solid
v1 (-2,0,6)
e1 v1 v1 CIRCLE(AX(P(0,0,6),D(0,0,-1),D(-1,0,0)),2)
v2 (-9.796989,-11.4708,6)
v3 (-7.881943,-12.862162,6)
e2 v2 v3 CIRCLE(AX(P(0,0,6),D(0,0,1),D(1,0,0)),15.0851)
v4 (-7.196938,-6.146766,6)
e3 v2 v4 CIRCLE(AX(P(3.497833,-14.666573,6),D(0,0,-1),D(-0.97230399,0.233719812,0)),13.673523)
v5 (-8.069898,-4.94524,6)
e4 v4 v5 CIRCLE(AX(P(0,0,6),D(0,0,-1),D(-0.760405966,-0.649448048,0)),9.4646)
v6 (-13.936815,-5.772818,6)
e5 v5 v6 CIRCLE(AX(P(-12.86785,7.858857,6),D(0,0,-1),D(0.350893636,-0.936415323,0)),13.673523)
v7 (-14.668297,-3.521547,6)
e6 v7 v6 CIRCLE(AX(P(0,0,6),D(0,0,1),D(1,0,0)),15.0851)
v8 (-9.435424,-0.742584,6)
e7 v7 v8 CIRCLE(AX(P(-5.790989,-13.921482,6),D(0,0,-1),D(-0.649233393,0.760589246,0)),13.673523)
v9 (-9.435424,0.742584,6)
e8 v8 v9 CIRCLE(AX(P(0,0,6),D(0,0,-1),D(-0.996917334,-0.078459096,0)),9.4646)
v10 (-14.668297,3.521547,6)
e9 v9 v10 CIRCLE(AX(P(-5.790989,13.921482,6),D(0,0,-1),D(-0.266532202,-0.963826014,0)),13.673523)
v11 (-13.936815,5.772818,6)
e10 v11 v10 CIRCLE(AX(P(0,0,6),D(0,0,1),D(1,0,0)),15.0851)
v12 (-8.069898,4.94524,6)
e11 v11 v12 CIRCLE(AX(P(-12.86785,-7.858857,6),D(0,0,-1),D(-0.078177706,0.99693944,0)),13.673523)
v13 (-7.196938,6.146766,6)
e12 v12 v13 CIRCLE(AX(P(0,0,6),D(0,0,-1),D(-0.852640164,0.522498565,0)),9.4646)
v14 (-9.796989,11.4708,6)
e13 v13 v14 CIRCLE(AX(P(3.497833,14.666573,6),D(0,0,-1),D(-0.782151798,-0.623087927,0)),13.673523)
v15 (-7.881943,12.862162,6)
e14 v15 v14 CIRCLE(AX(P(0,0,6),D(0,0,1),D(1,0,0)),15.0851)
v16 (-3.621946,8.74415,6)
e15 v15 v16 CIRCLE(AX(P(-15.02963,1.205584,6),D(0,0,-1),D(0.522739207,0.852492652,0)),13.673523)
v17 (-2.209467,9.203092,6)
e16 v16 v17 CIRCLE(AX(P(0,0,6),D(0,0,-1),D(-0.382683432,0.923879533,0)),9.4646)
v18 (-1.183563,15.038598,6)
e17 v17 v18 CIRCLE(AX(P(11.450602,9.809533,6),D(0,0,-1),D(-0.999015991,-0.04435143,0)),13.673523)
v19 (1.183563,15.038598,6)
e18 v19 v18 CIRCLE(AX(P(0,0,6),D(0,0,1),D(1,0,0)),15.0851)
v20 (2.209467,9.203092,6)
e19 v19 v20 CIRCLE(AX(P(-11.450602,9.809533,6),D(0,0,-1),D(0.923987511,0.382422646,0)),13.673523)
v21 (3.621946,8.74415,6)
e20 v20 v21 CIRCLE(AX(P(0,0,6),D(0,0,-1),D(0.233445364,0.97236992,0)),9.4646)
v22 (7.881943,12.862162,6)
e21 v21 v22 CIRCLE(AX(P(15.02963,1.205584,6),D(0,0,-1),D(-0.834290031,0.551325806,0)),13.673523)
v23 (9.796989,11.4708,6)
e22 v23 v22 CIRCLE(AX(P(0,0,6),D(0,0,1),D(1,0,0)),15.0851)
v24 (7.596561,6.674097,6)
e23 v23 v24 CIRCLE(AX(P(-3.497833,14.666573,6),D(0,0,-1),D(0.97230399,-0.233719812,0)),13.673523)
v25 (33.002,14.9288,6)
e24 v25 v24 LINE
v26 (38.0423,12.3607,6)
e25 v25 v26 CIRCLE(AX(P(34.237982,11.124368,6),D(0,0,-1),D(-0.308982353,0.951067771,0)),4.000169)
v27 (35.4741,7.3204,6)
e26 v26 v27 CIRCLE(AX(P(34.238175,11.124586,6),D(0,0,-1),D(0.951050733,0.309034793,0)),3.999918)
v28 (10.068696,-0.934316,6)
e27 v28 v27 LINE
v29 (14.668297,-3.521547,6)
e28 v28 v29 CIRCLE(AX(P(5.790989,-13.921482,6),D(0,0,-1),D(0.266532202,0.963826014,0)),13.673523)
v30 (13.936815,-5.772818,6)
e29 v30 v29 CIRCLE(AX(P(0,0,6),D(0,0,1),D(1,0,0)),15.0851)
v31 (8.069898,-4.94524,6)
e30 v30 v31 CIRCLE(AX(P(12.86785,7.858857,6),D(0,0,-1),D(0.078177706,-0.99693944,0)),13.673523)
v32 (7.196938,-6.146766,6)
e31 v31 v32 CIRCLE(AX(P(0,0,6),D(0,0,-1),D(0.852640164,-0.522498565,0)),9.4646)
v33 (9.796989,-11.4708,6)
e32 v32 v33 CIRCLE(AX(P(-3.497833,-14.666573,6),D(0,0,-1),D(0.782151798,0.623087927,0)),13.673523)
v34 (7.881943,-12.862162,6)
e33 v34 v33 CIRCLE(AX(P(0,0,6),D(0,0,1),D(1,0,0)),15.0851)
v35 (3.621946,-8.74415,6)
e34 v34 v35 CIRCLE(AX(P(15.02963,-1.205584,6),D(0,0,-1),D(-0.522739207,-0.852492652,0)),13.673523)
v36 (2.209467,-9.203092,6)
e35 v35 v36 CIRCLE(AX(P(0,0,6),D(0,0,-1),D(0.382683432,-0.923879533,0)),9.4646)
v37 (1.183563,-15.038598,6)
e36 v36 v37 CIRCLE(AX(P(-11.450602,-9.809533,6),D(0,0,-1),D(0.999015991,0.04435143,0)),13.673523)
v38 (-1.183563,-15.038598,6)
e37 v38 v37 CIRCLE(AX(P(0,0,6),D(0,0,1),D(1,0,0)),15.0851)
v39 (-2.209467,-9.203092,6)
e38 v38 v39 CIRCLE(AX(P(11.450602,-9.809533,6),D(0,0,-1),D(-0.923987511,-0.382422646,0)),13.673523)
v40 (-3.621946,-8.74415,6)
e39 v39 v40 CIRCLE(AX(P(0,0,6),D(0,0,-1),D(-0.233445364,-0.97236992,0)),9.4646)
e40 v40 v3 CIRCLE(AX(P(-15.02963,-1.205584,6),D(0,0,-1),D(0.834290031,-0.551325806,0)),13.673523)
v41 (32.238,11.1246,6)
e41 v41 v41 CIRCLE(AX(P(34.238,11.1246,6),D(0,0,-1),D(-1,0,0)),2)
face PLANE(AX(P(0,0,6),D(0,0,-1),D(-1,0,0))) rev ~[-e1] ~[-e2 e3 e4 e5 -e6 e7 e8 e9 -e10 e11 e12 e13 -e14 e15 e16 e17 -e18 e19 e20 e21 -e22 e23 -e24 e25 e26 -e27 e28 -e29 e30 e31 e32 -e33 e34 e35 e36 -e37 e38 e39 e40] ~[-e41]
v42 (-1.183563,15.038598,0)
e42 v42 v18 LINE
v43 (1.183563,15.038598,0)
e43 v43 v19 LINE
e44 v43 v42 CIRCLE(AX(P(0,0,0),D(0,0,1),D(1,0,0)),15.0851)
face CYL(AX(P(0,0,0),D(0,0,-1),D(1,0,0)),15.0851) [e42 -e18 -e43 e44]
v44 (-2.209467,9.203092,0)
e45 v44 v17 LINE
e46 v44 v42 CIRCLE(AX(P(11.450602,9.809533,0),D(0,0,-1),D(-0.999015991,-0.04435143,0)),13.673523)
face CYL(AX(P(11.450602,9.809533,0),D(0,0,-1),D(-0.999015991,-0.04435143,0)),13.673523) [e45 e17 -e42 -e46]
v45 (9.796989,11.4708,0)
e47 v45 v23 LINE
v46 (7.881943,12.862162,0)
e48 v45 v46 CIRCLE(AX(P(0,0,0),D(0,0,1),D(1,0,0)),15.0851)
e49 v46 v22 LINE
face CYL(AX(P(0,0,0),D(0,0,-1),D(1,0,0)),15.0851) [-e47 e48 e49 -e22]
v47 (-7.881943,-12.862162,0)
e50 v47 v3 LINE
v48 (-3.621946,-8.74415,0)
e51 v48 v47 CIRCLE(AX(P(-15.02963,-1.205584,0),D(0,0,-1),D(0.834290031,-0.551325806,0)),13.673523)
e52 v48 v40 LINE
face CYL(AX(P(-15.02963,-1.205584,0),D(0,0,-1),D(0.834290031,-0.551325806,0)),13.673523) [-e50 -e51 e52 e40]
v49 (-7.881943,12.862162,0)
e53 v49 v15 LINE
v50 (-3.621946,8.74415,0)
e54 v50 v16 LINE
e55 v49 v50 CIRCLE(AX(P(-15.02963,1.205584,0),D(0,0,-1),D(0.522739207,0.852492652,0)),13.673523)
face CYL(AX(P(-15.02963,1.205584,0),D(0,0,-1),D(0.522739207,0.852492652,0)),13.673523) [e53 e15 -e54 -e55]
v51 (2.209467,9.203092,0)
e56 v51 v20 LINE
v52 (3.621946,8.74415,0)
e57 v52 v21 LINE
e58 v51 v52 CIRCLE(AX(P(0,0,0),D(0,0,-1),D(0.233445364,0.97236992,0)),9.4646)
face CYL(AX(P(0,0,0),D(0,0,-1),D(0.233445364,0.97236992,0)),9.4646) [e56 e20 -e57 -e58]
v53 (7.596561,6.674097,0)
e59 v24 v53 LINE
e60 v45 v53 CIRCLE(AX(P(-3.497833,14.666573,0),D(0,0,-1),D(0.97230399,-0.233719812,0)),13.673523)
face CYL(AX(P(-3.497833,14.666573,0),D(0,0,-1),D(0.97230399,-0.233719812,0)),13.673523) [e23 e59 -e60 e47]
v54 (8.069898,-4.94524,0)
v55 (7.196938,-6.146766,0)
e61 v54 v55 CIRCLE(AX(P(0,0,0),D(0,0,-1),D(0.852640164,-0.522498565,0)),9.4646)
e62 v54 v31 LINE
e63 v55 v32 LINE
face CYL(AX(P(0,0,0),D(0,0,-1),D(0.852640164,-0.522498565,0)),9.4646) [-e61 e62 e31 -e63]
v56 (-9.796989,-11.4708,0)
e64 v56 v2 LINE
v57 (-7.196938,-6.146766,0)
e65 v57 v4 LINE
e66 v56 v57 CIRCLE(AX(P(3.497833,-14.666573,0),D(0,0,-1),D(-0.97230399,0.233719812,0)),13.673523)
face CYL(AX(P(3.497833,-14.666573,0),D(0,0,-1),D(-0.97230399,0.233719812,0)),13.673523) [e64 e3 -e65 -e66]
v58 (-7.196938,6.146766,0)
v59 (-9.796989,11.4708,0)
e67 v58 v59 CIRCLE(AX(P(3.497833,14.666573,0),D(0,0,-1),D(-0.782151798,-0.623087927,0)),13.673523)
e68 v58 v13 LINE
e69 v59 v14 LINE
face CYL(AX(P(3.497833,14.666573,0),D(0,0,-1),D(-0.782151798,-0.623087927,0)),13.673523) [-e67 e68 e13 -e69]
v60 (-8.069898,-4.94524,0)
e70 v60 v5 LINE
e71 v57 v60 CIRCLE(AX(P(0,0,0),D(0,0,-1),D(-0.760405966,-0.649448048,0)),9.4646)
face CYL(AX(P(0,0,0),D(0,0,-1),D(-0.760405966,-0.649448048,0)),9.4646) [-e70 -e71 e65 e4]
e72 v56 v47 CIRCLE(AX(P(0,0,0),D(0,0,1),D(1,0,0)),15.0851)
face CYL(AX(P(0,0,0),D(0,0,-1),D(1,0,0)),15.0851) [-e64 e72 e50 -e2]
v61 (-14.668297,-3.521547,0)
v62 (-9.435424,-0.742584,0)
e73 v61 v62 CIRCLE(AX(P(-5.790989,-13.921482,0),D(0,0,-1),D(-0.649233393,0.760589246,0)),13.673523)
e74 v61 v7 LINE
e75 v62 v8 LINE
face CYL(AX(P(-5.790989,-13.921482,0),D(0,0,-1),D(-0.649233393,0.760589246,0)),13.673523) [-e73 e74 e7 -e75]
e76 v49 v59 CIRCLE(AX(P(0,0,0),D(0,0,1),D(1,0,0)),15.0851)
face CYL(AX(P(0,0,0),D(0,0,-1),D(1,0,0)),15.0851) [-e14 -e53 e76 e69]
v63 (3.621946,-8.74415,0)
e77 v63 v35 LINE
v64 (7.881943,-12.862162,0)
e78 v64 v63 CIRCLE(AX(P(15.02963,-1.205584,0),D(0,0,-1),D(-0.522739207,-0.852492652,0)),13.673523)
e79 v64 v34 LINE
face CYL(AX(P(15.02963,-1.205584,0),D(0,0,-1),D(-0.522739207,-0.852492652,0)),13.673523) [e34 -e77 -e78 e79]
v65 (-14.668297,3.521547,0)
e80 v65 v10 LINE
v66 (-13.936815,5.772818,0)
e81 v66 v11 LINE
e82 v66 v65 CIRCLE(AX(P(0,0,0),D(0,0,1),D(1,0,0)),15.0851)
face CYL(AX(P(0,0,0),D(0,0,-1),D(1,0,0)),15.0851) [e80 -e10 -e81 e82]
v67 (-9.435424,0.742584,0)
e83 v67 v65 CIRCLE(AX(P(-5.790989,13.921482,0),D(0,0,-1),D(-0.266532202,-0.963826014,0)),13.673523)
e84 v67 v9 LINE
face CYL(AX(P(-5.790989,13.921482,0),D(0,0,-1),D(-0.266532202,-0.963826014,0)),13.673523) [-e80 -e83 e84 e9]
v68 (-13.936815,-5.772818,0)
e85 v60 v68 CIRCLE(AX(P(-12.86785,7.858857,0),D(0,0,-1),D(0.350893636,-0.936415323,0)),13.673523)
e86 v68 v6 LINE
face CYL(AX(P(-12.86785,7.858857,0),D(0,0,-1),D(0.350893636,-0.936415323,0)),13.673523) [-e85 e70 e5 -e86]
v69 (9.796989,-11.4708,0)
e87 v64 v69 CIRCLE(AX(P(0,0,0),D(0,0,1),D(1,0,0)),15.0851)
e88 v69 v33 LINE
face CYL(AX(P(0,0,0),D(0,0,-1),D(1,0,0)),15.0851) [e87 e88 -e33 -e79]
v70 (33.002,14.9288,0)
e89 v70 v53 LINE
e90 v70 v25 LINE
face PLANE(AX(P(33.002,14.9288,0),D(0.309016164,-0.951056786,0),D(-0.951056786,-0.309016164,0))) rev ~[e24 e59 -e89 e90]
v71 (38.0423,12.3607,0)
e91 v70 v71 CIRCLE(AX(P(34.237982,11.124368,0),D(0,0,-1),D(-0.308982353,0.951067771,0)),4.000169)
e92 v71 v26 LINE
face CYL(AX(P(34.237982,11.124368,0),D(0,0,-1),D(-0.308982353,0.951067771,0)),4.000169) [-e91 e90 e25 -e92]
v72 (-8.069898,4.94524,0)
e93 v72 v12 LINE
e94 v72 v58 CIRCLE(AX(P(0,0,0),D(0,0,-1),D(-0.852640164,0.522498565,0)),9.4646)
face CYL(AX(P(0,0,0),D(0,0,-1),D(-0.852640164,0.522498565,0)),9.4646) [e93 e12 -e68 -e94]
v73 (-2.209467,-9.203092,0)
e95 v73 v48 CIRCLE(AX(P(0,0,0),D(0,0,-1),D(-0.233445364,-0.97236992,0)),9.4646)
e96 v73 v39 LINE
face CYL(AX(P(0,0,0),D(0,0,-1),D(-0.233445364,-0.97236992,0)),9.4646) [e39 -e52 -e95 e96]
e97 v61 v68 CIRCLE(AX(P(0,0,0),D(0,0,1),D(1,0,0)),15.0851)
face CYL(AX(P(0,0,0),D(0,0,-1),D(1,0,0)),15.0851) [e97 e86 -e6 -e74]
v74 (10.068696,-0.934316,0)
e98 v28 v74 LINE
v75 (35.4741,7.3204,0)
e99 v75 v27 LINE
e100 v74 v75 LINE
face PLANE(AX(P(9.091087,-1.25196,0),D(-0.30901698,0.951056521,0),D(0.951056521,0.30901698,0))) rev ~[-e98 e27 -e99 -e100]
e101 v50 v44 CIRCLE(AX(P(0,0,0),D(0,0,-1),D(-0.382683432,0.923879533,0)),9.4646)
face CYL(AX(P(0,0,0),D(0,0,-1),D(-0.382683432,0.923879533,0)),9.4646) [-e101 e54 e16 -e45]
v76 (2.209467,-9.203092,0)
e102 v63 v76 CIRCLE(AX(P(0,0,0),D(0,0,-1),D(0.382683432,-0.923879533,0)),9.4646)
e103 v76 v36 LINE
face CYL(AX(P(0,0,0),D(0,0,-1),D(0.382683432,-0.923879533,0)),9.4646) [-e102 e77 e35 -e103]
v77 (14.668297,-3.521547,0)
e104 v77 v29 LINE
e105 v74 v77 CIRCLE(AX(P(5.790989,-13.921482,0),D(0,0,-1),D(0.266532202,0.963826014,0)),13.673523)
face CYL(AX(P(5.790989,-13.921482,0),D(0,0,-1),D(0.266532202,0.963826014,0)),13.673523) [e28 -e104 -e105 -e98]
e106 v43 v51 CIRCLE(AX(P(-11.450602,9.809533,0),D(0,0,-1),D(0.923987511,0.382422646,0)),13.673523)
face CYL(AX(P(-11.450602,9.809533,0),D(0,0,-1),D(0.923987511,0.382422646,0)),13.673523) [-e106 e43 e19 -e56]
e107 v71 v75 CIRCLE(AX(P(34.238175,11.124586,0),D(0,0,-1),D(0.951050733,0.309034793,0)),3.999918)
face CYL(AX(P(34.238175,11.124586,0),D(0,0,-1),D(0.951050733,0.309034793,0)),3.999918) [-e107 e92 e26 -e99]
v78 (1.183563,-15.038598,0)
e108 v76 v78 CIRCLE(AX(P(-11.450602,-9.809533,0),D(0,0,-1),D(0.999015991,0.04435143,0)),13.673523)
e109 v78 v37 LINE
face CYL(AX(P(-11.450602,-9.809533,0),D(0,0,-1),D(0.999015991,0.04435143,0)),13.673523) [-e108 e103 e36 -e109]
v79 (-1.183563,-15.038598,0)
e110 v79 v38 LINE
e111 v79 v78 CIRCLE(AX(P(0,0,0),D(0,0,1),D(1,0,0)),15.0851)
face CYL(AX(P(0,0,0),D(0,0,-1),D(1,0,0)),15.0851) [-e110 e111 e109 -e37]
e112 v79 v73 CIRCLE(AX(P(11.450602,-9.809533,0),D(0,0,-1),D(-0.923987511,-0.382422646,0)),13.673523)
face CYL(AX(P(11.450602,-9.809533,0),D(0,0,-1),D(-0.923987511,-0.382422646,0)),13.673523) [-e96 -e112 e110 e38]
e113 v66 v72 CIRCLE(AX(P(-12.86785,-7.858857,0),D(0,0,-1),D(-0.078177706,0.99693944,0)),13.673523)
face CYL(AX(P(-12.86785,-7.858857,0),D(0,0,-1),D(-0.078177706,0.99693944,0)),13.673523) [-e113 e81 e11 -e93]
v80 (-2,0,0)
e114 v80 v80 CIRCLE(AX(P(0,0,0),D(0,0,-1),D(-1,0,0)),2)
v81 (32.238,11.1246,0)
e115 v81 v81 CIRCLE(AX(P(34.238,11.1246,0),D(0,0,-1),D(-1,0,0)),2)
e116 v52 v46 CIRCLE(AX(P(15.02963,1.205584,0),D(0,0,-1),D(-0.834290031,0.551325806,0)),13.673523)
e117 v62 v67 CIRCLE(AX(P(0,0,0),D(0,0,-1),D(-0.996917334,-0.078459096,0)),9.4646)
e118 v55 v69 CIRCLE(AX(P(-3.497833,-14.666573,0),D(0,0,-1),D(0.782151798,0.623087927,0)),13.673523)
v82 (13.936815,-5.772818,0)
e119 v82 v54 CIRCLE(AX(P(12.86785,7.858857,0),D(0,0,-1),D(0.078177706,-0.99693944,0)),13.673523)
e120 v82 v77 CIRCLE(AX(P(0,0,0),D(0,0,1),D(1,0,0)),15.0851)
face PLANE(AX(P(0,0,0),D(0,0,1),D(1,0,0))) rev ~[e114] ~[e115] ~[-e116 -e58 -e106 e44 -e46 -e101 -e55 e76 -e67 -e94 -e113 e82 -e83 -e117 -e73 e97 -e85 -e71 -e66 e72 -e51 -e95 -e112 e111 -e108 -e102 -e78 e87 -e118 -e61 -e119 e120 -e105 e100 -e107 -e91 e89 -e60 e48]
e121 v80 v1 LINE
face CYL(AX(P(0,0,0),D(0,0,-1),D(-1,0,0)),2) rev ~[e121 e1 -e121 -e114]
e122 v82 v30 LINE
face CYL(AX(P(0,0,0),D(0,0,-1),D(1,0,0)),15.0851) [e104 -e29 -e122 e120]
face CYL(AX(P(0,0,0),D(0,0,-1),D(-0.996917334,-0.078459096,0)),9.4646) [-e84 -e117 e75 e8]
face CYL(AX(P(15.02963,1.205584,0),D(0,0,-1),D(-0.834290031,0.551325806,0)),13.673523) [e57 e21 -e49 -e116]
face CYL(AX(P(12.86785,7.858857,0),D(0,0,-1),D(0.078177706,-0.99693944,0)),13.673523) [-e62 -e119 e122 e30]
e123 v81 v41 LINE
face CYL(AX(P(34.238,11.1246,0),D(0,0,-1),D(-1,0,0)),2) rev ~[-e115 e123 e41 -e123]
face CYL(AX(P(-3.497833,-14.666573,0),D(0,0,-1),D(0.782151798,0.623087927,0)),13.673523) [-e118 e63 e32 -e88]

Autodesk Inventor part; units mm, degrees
sketch "Sketch1" plane through (0, 0, 0) normal (0, 0, 1) x (1, 0, 0)
  circle A0 centre (0, 0) radius 15.0851
  dimension "d0" = 30.1702
extrude "Extrusion1" add sketch "Sketch1" along normal blind 6
ref_plane "Work Plane2" through (0, 0, 3) normal (0, 0, 1) x (-1, 0, 0)
sketch "Sketch2" plane through (0, 0, 0) normal (0, 0, -1) x (-1, 0, 0)
  circle A0 centre (0, 0) radius 15.0851 projected
  circle A1 centre (0, 0) radius 12.5
  dimension "d3" = 25
surface extrude "Pitch Diameter" sketch "Sketch2" against normal through all shown no curves A1
ref_plane "Work Plane8" through (0, 0, 0) normal (0.9510565, 0.309017, 0) x (0, 0, 1)
ref_plane "Work Plane9" through (0, 0, 0) normal (1, 0, 0) x (0, 1, 0)
spur gear teeth "Spur Gear" teeth 10 pitch diameter 25 tip diameter 30.1702 root diameter 18.9292 face width 6 start plane through (0, 0, 0) normal (0, 0, -1) x (-1, 0, 0)
sketch "Sketch3" plane through (0, 0, 0) normal (0, 0, -1) x (-1, 0, 0)
  circle A0 centre (0, 0) radius 2
  dimension "d49" = 4
extrude "Extrusion2" cut sketch "Sketch3" against normal up to surface (6 mm away)
sketch "Sketch4" plane through (0, 0, 0) normal (0, 0, -1) x (-1, 0, 0)
  circle A0 centre (-26.4586, 35.0672) radius 2 projected
  line L0 (-4.8178, 32.2415) -> (-25.2225, 38.8714) projected
  arc A1 (-25.2225, 38.8714) -> (-27.6947, 31.263) centre (-26.4586, 35.0672) ccw projected
  line L1 (-27.6947, 31.263) -> (-7.2899, 24.6331) projected
  arc A2 (-7.2899, 24.6331) -> (-7.2592, 22.759) centre (7.7794, 23.9426) ccw projected
  arc A3 (-7.2592, 22.759) -> (-1.4237, 21.7331) centre (-2.0301, 35.3932) ccw projected
  arc A4 (-1.4237, 21.7331) -> (-0.9647, 20.3206) centre (7.7794, 23.9426) ccw projected
  arc A5 (-0.9647, 20.3206) -> (-5.0828, 16.0606) centre (6.5738, 8.913) ccw projected
  arc A6 (-5.0828, 16.0606) -> (-3.6914, 14.1456) centre (7.7794, 23.9426) ccw projected
  arc A7 (-3.6914, 14.1456) -> (1.6326, 16.7456) centre (-6.8872, 27.4404) ccw projected
  arc A8 (1.6326, 16.7456) -> (2.8342, 15.8727) centre (7.7794, 23.9426) ccw projected
  arc A9 (2.8342, 15.8727) -> (2.0066, 10.0058) centre (15.6383, 11.0747) ccw projected
  arc A10 (2.0066, 10.0058) -> (4.2579, 9.2743) centre (7.7794, 23.9426) ccw projected
  arc A11 (4.2579, 9.2743) -> (7.0368, 14.5072) centre (-6.1421, 18.1516) ccw projected
  arc A12 (7.0368, 14.5072) -> (8.522, 14.5072) centre (7.7794, 23.9426) ccw projected
  arc A13 (8.522, 14.5072) -> (11.301, 9.2743) centre (21.7009, 18.1516) ccw projected
  arc A14 (11.301, 9.2743) -> (13.5522, 10.0058) centre (7.7794, 23.9426) ccw projected
  arc A15 (13.5522, 10.0058) -> (12.7247, 15.8727) centre (-0.0794, 11.0747) ccw projected
  arc A16 (12.7247, 15.8727) -> (13.9262, 16.7456) centre (7.7794, 23.9426) ccw projected
  arc A17 (13.9262, 16.7456) -> (19.2502, 14.1456) centre (22.446, 27.4404) ccw projected
  arc A18 (19.2502, 14.1456) -> (20.6416, 16.0606) centre (7.7794, 23.9426) ccw projected
  arc A19 (20.6416, 16.0606) -> (16.5236, 20.3206) centre (8.985, 8.913) ccw projected
  arc A20 (16.5236, 20.3206) -> (16.9825, 21.7331) centre (7.7794, 23.9426) ccw projected
  arc A21 (16.9825, 21.7331) -> (22.818, 22.759) centre (17.589, 35.3932) ccw projected
  arc A22 (22.818, 22.759) -> (22.818, 25.1262) centre (7.7794, 23.9426) ccw projected
  arc A23 (22.818, 25.1262) -> (16.9825, 26.1521) centre (17.589, 12.492) ccw projected
  arc A24 (16.9825, 26.1521) -> (16.5236, 27.5646) centre (7.7794, 23.9426) ccw projected
  arc A25 (16.5236, 27.5646) -> (20.6416, 31.8246) centre (8.985, 38.9722) ccw projected
  arc A26 (20.6416, 31.8246) -> (19.2502, 33.7396) centre (7.7794, 23.9426) ccw projected
  arc A27 (19.2502, 33.7396) -> (13.9262, 31.1396) centre (22.446, 20.4448) ccw projected
  arc A28 (13.9262, 31.1396) -> (12.7247, 32.0125) centre (7.7794, 23.9426) ccw projected
  arc A29 (12.7247, 32.0125) -> (13.5522, 37.8794) centre (-0.0794, 36.8105) ccw projected
  arc A30 (13.5522, 37.8794) -> (11.301, 38.6109) centre (7.7794, 23.9426) ccw projected
  arc A31 (11.301, 38.6109) -> (8.522, 33.378) centre (21.7009, 29.7336) ccw projected
  arc A32 (8.522, 33.378) -> (7.0368, 33.378) centre (7.7794, 23.9426) ccw projected
  arc A33 (7.0368, 33.378) -> (4.2579, 38.6109) centre (-6.1421, 29.7336) ccw projected
  arc A34 (4.2579, 38.6109) -> (2.0066, 37.8794) centre (7.7794, 23.9426) ccw projected
  arc A35 (2.0066, 37.8794) -> (2.8342, 32.0125) centre (15.6383, 36.8105) ccw projected
  arc A36 (2.8342, 32.0125) -> (1.6326, 31.1396) centre (7.7794, 23.9426) ccw projected
  arc A37 (1.6326, 31.1396) -> (-3.6914, 33.7396) centre (-6.8872, 20.4448) ccw projected
  arc A38 (-3.6914, 33.7396) -> (-4.8178, 32.2415) centre (7.7794, 23.9426) ccw projected
  circle A39 centre (7.7794, 23.9426) radius 1.5 projected
  line L2 (-1.2361, -3.8042) -> (-35.4741, 7.3204)
  line L3 (-38.0423, 12.3607) -> (-38.0423, 12.3607)
  line L4 (-33.002, 14.9288) -> (1.2361, 3.8042)
  line L5 (1.2361, 3.8042) -> (-1.2361, -3.8042)
  circle A40 centre (-34.238, 11.1246) radius 2
  arc A41 (-38.0423, 12.3607) -> (-35.4741, 7.3204) centre (-34.238, 11.1246) ccw
  arc A42 (-33.002, 14.9288) -> (-38.0423, 12.3607) centre (-34.238, 11.1246) ccw
  line L6 (-6.619, 6.3565) -> (-9.0911, -1.252)
  point P0 (0, 0)
  point P1 (-36.8062, 16.1649)
  point P2 (-39.2783, 8.5565)
  point P3 (-38.0423, 12.3607)
  dimension "d61" = 40
  dimension "d62" = 8
  dimension "d63" = 4
  dimension "d64" = 0
  dimension "d65" = 4
  dimension "d66" = 4
  dimension "d67" = 4
extrude "Extrusion3" add sketch "Sketch4" against normal up to surface (6 mm away) contours L2 A41 A42 L4 L6
equation "\"d0\" = da_da"
equation "\"d1\" = da_b"
equation "\"d3\" = da_d"
equation "\"d16\" = da_aw"
equation "\"d43\" = da_aw"
equation "\"d46\" = da_aw"
equation "\"da_da\" = 30.170238"
equation "\"da_b\" = 6"
equation "\"da_d\" = 25"
equation "\"da_aw\" = 25.174739"
properties part number "Spur Gear2" material "Steel"
